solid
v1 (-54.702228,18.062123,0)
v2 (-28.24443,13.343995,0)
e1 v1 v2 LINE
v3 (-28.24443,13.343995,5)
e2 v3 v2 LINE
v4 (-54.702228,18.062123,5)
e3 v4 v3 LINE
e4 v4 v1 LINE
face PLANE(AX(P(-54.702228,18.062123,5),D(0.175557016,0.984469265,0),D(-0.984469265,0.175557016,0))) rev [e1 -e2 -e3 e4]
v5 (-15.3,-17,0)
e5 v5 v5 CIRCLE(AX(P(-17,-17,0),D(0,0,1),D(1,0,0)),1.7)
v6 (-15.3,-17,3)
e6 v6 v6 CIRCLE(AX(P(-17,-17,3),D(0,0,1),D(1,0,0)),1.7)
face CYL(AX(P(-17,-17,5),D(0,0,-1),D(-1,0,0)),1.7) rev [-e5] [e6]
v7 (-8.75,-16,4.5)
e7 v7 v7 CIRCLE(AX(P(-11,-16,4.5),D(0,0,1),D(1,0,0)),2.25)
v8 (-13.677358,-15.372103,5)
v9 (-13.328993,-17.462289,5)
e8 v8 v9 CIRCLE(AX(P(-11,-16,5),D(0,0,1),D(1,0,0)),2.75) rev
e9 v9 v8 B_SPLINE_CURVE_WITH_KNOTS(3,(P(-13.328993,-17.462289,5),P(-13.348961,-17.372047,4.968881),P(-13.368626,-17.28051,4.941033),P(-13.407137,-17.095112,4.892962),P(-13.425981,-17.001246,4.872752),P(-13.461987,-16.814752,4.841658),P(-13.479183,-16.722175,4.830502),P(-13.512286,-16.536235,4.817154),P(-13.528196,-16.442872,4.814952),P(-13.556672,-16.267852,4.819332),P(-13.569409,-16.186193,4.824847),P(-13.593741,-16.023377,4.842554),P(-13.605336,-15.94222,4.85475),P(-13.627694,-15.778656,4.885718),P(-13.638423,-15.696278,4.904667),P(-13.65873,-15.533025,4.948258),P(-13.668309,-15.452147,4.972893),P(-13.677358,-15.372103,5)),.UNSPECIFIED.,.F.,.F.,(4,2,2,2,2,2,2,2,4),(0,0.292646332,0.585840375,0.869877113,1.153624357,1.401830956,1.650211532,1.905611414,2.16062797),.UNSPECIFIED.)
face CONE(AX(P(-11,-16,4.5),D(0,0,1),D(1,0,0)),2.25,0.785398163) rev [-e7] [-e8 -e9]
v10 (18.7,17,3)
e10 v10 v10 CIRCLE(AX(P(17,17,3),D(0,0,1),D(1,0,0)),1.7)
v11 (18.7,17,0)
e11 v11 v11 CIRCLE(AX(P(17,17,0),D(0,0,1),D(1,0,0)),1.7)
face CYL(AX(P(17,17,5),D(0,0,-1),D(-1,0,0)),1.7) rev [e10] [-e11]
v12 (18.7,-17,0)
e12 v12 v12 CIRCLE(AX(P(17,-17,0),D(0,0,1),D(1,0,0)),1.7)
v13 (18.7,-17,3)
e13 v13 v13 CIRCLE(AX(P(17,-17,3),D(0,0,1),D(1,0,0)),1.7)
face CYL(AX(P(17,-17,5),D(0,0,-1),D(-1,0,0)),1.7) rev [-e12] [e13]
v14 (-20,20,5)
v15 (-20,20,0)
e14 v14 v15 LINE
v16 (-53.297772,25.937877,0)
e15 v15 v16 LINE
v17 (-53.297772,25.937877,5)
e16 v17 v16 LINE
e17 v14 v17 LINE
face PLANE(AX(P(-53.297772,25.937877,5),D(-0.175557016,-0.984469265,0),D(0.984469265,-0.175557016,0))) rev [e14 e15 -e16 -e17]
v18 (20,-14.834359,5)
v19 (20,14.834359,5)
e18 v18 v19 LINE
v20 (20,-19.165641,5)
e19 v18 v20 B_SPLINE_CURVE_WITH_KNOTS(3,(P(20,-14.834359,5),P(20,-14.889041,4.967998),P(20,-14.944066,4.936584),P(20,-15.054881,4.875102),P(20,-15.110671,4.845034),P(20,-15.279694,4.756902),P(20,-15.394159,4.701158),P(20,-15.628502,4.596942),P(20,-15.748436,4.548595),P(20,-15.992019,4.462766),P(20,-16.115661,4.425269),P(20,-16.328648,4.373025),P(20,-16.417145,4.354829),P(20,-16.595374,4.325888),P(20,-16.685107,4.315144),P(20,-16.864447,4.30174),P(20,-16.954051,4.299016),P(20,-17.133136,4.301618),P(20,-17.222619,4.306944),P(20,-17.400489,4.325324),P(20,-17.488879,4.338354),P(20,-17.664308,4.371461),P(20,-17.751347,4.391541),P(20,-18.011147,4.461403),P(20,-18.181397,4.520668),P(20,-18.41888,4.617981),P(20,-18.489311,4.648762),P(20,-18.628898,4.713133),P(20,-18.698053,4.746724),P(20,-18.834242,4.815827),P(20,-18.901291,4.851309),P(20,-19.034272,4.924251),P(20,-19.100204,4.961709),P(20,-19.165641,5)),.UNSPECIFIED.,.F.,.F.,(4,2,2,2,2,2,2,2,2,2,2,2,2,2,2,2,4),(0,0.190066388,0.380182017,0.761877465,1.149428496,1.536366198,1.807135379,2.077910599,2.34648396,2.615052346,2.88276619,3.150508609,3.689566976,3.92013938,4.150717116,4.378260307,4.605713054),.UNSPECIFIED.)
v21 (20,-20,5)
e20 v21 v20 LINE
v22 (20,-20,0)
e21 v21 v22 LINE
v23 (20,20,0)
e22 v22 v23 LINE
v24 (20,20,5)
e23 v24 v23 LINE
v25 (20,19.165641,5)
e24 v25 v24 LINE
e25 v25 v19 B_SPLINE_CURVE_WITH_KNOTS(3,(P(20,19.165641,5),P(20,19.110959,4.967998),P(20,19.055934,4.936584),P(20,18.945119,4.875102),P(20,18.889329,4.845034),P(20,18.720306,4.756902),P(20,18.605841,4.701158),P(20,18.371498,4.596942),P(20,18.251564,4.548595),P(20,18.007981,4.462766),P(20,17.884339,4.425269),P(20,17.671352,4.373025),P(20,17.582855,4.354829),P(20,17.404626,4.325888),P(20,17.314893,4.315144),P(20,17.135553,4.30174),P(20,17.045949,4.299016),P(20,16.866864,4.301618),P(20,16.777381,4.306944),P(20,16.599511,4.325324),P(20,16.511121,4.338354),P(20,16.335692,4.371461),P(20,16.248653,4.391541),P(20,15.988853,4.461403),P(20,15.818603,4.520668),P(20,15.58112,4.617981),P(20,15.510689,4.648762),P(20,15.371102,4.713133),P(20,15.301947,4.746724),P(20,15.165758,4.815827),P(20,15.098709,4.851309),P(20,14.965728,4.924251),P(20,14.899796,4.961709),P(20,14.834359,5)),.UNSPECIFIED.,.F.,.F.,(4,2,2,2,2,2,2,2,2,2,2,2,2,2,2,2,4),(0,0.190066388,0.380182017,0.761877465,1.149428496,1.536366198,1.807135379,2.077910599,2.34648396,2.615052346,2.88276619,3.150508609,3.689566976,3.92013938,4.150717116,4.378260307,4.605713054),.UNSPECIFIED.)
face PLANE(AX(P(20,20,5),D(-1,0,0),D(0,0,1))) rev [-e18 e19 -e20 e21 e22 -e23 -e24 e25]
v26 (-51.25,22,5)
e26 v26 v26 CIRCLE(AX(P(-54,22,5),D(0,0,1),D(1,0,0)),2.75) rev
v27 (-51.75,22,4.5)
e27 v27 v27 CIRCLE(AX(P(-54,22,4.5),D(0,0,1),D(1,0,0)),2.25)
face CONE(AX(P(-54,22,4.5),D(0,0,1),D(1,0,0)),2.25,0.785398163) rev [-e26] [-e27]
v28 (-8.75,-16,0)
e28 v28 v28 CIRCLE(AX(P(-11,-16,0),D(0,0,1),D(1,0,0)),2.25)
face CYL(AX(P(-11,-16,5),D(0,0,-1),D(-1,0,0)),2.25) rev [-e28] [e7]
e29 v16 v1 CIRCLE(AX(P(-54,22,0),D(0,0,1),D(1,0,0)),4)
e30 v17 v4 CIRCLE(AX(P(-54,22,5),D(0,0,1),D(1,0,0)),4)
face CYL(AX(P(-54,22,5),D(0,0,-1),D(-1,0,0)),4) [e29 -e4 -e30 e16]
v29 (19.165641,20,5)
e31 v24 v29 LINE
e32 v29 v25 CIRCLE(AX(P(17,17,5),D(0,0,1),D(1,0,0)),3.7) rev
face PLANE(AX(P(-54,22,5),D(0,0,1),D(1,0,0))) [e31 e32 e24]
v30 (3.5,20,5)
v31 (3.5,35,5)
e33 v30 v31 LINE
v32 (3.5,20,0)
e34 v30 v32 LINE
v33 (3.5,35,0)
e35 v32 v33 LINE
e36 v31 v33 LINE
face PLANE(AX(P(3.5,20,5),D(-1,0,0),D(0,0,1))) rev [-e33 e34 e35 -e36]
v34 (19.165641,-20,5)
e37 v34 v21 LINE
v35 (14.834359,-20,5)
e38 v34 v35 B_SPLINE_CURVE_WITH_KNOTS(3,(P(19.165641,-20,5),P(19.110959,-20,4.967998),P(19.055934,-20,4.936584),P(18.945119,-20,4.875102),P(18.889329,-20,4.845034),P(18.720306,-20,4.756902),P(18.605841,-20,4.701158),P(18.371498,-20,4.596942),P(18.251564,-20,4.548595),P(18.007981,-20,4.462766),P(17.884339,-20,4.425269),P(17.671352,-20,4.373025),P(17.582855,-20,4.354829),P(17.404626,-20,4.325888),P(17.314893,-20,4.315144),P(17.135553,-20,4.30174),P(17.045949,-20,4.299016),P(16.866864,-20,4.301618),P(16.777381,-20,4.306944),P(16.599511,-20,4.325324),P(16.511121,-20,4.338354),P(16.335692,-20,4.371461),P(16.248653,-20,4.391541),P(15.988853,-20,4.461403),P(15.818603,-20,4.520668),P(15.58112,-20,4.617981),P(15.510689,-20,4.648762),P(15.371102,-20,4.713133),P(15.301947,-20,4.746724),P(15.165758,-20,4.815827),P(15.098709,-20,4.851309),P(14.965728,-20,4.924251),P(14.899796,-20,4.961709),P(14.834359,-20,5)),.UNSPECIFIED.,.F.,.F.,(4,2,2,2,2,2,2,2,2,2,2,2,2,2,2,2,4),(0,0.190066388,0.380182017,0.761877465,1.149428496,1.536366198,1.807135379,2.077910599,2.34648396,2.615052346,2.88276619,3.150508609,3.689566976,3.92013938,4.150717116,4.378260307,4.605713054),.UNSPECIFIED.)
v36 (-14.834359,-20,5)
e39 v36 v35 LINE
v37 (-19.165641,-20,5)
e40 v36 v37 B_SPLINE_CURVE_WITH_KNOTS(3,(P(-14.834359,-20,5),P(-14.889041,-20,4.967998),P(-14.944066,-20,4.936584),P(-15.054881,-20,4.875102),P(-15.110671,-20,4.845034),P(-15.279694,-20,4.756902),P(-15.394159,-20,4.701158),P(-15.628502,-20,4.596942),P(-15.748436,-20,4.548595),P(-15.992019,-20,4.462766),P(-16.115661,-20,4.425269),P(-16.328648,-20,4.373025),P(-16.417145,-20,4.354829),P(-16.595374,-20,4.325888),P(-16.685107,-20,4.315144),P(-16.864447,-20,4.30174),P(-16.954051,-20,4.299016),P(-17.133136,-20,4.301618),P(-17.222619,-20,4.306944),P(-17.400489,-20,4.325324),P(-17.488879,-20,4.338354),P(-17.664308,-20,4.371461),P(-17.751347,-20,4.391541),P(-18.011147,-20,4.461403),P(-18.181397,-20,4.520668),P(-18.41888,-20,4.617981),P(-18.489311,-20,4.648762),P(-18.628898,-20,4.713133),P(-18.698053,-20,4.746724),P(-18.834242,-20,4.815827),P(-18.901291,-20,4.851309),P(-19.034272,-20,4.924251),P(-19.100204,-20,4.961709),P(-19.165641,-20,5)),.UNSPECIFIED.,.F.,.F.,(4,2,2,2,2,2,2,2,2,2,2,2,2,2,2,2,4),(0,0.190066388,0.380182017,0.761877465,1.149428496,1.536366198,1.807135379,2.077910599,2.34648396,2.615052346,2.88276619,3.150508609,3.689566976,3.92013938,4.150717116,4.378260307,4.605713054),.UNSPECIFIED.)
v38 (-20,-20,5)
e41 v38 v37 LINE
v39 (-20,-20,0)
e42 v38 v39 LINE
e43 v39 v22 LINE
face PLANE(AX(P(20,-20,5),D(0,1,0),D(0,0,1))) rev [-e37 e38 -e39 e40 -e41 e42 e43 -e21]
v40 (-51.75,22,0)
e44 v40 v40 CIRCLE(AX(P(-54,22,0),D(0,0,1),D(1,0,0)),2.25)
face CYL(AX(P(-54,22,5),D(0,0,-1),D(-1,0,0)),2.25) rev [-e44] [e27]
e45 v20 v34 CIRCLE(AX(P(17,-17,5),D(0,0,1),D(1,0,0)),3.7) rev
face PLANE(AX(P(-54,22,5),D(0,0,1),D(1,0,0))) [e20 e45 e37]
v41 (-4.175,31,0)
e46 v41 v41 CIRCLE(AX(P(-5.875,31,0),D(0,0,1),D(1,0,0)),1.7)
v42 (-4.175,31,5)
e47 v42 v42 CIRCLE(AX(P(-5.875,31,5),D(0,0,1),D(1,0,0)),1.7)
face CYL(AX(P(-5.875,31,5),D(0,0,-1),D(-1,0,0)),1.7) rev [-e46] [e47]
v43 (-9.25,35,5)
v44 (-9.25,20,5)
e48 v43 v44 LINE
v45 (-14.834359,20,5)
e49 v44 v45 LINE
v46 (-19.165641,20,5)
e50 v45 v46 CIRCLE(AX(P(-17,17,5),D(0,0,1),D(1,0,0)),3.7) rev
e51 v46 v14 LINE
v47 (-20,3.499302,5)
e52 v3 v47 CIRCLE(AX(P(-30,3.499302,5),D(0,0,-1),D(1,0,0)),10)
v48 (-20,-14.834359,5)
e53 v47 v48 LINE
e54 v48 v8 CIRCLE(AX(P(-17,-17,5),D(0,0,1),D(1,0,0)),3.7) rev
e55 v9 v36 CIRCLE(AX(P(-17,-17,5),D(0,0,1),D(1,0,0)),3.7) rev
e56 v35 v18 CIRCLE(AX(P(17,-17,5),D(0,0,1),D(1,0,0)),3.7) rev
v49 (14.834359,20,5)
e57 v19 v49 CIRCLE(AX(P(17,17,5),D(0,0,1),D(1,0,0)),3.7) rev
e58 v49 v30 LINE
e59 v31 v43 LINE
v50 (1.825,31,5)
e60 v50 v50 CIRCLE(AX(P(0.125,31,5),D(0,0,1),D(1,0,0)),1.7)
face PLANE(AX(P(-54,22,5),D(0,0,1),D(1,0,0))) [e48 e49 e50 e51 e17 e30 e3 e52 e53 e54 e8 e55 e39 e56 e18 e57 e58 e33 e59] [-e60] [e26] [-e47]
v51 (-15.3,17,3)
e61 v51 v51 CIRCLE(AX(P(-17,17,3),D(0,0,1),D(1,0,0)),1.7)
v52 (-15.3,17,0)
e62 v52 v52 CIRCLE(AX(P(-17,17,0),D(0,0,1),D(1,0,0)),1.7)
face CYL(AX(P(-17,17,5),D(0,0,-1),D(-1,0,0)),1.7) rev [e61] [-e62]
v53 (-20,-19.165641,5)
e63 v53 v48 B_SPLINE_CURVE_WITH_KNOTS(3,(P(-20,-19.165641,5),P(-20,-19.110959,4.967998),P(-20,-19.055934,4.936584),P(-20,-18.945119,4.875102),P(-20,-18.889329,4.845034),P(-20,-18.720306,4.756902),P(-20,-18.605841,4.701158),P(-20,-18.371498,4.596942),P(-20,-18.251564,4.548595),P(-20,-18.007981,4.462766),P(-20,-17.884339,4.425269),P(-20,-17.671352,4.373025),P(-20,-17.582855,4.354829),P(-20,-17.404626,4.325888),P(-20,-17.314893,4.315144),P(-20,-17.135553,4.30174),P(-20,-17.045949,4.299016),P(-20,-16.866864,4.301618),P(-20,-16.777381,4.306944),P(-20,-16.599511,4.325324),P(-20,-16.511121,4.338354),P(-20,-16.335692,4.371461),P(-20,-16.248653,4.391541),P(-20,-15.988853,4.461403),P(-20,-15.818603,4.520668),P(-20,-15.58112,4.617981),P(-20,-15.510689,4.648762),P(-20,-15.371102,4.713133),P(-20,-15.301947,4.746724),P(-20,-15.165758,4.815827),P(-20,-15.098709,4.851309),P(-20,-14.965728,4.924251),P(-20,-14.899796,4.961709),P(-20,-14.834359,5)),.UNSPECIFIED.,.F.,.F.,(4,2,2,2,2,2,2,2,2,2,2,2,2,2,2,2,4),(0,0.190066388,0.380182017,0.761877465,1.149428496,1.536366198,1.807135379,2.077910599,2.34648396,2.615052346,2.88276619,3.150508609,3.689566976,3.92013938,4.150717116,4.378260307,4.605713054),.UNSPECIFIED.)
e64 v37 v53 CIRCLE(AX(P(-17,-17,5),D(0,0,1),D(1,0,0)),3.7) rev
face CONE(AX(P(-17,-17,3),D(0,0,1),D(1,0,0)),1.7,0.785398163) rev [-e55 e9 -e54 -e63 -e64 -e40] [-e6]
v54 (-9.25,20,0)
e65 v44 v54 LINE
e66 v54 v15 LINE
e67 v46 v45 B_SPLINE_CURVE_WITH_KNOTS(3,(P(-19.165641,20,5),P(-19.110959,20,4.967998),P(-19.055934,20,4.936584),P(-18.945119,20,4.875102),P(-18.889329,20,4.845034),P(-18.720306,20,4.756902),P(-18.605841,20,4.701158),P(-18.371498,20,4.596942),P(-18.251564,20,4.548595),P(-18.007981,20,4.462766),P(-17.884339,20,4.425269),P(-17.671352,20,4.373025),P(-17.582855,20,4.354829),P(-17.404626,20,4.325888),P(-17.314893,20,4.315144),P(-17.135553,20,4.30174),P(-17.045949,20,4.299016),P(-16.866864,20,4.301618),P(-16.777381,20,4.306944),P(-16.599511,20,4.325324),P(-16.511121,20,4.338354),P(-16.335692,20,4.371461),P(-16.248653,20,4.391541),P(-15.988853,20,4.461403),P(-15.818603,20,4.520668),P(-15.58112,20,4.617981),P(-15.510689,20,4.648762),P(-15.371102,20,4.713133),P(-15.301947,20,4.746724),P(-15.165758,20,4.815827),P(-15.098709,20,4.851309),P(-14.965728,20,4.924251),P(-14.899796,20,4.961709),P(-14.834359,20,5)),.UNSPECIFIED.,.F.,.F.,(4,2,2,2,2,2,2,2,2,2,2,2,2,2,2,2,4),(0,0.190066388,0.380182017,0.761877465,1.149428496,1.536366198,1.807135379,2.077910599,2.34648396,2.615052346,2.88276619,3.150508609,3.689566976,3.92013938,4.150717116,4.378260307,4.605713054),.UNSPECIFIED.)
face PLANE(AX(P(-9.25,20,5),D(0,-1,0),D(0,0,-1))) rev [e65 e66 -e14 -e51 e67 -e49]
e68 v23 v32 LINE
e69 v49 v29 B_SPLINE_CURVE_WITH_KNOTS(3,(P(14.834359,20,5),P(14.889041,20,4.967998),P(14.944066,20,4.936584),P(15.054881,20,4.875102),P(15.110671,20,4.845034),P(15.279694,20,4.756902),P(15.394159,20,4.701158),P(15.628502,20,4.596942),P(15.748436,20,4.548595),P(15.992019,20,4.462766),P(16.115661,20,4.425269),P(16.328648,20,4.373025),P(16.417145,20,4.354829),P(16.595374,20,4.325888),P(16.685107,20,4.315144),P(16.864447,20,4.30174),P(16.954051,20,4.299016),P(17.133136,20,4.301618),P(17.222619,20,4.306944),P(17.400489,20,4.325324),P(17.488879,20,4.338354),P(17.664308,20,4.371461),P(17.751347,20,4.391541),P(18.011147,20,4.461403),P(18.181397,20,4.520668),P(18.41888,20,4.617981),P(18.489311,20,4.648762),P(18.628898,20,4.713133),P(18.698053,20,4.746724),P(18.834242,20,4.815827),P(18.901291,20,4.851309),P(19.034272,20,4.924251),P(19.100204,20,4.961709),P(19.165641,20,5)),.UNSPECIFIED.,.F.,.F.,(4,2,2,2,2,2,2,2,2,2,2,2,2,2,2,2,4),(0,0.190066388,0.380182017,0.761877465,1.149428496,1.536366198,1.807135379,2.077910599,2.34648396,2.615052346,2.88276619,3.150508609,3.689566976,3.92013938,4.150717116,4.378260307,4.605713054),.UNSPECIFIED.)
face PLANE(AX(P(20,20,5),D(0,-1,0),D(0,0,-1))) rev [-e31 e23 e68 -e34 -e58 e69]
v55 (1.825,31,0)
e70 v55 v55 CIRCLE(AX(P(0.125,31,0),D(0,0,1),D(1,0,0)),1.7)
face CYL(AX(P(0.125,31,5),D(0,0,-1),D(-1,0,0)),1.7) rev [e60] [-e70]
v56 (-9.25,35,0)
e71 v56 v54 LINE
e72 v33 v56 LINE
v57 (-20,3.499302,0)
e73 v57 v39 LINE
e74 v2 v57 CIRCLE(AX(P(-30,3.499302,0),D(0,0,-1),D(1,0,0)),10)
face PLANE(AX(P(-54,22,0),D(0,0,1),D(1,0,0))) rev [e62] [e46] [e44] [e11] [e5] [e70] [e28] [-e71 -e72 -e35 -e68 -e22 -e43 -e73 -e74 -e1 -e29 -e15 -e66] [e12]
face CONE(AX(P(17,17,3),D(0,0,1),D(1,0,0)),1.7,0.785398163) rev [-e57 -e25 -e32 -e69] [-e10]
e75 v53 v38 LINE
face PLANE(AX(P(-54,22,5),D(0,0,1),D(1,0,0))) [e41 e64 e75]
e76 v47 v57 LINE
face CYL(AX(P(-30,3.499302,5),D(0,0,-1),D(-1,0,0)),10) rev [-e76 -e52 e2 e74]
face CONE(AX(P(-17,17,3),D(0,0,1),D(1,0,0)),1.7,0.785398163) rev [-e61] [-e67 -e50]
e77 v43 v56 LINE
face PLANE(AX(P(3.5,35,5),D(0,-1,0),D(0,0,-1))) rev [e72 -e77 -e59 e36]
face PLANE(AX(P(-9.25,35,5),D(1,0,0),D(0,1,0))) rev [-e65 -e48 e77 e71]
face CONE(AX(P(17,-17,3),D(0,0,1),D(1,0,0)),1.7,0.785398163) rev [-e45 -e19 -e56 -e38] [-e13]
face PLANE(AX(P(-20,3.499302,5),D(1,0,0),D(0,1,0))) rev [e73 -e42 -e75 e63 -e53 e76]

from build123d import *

# Parameters (mm, degrees)
SKETCH1_R           = 1.7
SKETCH1_R_2         = 2.25
BOSS_EXTRUDE1_DEPTH = 5
CHAMFER1_SIZE       = 2
CHAMFER2_SIZE       = 0.5


with BuildPart() as part:
    # Sketch1 → Boss-Extrude1 (new body)
    with BuildSketch(Plane.XY):
        with BuildLine():
            Line((3.5, 20), (3.5, 35))
            Line((3.5, 35), (-9.25, 35))
            Line((-9.25, 35), (-9.25, 20))
            Line((-9.25, 20), (-20, 20))
            Line((-20, 20), (-53.297771938, 25.937877061))
            ThreePointArc((-53.297771938, 25.937877061), (-57.937877061, 22.702228062), (-54.702228062, 18.062122939))
            Line((-54.702228062, 18.062122939), (-28.244429844, 13.343994848))
            ThreePointArc((-28.244429844, 13.343994848), (-22.333328572, 9.919749939), (-20, 3.499302196))
            Line((-20, 3.499302196), (-20, -20))
            Line((-20, -20), (20, -20))
            Line((20, -20), (20, 20))
            Line((20, 20), (3.5, 20))
        make_face()
        with Locations((-17, 17)):
            Circle(SKETCH1_R, mode=Mode.SUBTRACT)
        with Locations((17, 17)):
            Circle(SKETCH1_R, mode=Mode.SUBTRACT)
        with Locations((17, -17)):
            Circle(SKETCH1_R, mode=Mode.SUBTRACT)
        with Locations((-17, -17)):
            Circle(SKETCH1_R, mode=Mode.SUBTRACT)
        with Locations((-5.875, 31)):
            Circle(SKETCH1_R, mode=Mode.SUBTRACT)
        with Locations((0.125, 31)):
            Circle(SKETCH1_R, mode=Mode.SUBTRACT)
        with Locations((-11, -16)):
            Circle(SKETCH1_R_2, mode=Mode.SUBTRACT)
        with Locations((-54, 22)):
            Circle(SKETCH1_R_2, mode=Mode.SUBTRACT)
    extrude(amount=BOSS_EXTRUDE1_DEPTH)

    # Chamfer1
    # the kernel refuses this chamfer: 2 mm, written as the material it takes off along each edge
    with BuildSketch(Plane(origin=(-17, 17, 5), x_dir=(1, 0, 0), z_dir=(0, -1, 0))) as chamfer1_piece_1:
        Polygon((1.7, -CHAMFER1_SIZE), (1.7 + CHAMFER1_SIZE, 0), (1.7, 0), align=None)
    revolve(axis=Axis((-17, 17, 5), (0, 0, 1)), mode=Mode.SUBTRACT)
    with BuildSketch(Plane(origin=(17, 17, 5), x_dir=(1, 0, 0), z_dir=(0, -1, 0))) as chamfer1_piece_2:
        Polygon((1.7, -CHAMFER1_SIZE), (1.7 + CHAMFER1_SIZE, 0), (1.7, 0), align=None)
    revolve(axis=Axis((17, 17, 5), (0, 0, 1)), mode=Mode.SUBTRACT)
    with BuildSketch(Plane(origin=(17, -17, 5), x_dir=(1, 0, 0), z_dir=(0, -1, 0))) as chamfer1_piece_3:
        Polygon((1.7, -CHAMFER1_SIZE), (1.7 + CHAMFER1_SIZE, 0), (1.7, 0), align=None)
    revolve(axis=Axis((17, -17, 5), (0, 0, 1)), mode=Mode.SUBTRACT)
    with BuildSketch(Plane(origin=(-17, -17, 5), x_dir=(1, 0, 0), z_dir=(0, -1, 0))) as chamfer1_piece_4:
        Polygon((1.7, -CHAMFER1_SIZE), (1.7 + CHAMFER1_SIZE, 0), (1.7, 0), align=None)
    revolve(axis=Axis((-17, -17, 5), (0, 0, 1)), mode=Mode.SUBTRACT)

    # Chamfer2
    # the kernel refuses this chamfer: 0.5 mm, written as the material it takes off along each edge
    with BuildSketch(Plane(origin=(-11, -16, 5), x_dir=(1, 0, 0), z_dir=(0, -1, 0))) as chamfer2_piece_1:
        Polygon((2.25 + CHAMFER2_SIZE, 0), (2.25, -CHAMFER2_SIZE), (2.25, 0), align=None)
    revolve(axis=Axis((-11, -16, 5), (0, 0, 1)), mode=Mode.SUBTRACT)
    with BuildSketch(Plane(origin=(-54, 22, 5), x_dir=(1, 0, 0), z_dir=(0, -1, 0))) as chamfer2_piece_2:
        Polygon((2.25 + CHAMFER2_SIZE, 0), (2.25, -CHAMFER2_SIZE), (2.25, 0), align=None)
    revolve(axis=Axis((-54, 22, 5), (0, 0, 1)), mode=Mode.SUBTRACT)


solid = part.part
